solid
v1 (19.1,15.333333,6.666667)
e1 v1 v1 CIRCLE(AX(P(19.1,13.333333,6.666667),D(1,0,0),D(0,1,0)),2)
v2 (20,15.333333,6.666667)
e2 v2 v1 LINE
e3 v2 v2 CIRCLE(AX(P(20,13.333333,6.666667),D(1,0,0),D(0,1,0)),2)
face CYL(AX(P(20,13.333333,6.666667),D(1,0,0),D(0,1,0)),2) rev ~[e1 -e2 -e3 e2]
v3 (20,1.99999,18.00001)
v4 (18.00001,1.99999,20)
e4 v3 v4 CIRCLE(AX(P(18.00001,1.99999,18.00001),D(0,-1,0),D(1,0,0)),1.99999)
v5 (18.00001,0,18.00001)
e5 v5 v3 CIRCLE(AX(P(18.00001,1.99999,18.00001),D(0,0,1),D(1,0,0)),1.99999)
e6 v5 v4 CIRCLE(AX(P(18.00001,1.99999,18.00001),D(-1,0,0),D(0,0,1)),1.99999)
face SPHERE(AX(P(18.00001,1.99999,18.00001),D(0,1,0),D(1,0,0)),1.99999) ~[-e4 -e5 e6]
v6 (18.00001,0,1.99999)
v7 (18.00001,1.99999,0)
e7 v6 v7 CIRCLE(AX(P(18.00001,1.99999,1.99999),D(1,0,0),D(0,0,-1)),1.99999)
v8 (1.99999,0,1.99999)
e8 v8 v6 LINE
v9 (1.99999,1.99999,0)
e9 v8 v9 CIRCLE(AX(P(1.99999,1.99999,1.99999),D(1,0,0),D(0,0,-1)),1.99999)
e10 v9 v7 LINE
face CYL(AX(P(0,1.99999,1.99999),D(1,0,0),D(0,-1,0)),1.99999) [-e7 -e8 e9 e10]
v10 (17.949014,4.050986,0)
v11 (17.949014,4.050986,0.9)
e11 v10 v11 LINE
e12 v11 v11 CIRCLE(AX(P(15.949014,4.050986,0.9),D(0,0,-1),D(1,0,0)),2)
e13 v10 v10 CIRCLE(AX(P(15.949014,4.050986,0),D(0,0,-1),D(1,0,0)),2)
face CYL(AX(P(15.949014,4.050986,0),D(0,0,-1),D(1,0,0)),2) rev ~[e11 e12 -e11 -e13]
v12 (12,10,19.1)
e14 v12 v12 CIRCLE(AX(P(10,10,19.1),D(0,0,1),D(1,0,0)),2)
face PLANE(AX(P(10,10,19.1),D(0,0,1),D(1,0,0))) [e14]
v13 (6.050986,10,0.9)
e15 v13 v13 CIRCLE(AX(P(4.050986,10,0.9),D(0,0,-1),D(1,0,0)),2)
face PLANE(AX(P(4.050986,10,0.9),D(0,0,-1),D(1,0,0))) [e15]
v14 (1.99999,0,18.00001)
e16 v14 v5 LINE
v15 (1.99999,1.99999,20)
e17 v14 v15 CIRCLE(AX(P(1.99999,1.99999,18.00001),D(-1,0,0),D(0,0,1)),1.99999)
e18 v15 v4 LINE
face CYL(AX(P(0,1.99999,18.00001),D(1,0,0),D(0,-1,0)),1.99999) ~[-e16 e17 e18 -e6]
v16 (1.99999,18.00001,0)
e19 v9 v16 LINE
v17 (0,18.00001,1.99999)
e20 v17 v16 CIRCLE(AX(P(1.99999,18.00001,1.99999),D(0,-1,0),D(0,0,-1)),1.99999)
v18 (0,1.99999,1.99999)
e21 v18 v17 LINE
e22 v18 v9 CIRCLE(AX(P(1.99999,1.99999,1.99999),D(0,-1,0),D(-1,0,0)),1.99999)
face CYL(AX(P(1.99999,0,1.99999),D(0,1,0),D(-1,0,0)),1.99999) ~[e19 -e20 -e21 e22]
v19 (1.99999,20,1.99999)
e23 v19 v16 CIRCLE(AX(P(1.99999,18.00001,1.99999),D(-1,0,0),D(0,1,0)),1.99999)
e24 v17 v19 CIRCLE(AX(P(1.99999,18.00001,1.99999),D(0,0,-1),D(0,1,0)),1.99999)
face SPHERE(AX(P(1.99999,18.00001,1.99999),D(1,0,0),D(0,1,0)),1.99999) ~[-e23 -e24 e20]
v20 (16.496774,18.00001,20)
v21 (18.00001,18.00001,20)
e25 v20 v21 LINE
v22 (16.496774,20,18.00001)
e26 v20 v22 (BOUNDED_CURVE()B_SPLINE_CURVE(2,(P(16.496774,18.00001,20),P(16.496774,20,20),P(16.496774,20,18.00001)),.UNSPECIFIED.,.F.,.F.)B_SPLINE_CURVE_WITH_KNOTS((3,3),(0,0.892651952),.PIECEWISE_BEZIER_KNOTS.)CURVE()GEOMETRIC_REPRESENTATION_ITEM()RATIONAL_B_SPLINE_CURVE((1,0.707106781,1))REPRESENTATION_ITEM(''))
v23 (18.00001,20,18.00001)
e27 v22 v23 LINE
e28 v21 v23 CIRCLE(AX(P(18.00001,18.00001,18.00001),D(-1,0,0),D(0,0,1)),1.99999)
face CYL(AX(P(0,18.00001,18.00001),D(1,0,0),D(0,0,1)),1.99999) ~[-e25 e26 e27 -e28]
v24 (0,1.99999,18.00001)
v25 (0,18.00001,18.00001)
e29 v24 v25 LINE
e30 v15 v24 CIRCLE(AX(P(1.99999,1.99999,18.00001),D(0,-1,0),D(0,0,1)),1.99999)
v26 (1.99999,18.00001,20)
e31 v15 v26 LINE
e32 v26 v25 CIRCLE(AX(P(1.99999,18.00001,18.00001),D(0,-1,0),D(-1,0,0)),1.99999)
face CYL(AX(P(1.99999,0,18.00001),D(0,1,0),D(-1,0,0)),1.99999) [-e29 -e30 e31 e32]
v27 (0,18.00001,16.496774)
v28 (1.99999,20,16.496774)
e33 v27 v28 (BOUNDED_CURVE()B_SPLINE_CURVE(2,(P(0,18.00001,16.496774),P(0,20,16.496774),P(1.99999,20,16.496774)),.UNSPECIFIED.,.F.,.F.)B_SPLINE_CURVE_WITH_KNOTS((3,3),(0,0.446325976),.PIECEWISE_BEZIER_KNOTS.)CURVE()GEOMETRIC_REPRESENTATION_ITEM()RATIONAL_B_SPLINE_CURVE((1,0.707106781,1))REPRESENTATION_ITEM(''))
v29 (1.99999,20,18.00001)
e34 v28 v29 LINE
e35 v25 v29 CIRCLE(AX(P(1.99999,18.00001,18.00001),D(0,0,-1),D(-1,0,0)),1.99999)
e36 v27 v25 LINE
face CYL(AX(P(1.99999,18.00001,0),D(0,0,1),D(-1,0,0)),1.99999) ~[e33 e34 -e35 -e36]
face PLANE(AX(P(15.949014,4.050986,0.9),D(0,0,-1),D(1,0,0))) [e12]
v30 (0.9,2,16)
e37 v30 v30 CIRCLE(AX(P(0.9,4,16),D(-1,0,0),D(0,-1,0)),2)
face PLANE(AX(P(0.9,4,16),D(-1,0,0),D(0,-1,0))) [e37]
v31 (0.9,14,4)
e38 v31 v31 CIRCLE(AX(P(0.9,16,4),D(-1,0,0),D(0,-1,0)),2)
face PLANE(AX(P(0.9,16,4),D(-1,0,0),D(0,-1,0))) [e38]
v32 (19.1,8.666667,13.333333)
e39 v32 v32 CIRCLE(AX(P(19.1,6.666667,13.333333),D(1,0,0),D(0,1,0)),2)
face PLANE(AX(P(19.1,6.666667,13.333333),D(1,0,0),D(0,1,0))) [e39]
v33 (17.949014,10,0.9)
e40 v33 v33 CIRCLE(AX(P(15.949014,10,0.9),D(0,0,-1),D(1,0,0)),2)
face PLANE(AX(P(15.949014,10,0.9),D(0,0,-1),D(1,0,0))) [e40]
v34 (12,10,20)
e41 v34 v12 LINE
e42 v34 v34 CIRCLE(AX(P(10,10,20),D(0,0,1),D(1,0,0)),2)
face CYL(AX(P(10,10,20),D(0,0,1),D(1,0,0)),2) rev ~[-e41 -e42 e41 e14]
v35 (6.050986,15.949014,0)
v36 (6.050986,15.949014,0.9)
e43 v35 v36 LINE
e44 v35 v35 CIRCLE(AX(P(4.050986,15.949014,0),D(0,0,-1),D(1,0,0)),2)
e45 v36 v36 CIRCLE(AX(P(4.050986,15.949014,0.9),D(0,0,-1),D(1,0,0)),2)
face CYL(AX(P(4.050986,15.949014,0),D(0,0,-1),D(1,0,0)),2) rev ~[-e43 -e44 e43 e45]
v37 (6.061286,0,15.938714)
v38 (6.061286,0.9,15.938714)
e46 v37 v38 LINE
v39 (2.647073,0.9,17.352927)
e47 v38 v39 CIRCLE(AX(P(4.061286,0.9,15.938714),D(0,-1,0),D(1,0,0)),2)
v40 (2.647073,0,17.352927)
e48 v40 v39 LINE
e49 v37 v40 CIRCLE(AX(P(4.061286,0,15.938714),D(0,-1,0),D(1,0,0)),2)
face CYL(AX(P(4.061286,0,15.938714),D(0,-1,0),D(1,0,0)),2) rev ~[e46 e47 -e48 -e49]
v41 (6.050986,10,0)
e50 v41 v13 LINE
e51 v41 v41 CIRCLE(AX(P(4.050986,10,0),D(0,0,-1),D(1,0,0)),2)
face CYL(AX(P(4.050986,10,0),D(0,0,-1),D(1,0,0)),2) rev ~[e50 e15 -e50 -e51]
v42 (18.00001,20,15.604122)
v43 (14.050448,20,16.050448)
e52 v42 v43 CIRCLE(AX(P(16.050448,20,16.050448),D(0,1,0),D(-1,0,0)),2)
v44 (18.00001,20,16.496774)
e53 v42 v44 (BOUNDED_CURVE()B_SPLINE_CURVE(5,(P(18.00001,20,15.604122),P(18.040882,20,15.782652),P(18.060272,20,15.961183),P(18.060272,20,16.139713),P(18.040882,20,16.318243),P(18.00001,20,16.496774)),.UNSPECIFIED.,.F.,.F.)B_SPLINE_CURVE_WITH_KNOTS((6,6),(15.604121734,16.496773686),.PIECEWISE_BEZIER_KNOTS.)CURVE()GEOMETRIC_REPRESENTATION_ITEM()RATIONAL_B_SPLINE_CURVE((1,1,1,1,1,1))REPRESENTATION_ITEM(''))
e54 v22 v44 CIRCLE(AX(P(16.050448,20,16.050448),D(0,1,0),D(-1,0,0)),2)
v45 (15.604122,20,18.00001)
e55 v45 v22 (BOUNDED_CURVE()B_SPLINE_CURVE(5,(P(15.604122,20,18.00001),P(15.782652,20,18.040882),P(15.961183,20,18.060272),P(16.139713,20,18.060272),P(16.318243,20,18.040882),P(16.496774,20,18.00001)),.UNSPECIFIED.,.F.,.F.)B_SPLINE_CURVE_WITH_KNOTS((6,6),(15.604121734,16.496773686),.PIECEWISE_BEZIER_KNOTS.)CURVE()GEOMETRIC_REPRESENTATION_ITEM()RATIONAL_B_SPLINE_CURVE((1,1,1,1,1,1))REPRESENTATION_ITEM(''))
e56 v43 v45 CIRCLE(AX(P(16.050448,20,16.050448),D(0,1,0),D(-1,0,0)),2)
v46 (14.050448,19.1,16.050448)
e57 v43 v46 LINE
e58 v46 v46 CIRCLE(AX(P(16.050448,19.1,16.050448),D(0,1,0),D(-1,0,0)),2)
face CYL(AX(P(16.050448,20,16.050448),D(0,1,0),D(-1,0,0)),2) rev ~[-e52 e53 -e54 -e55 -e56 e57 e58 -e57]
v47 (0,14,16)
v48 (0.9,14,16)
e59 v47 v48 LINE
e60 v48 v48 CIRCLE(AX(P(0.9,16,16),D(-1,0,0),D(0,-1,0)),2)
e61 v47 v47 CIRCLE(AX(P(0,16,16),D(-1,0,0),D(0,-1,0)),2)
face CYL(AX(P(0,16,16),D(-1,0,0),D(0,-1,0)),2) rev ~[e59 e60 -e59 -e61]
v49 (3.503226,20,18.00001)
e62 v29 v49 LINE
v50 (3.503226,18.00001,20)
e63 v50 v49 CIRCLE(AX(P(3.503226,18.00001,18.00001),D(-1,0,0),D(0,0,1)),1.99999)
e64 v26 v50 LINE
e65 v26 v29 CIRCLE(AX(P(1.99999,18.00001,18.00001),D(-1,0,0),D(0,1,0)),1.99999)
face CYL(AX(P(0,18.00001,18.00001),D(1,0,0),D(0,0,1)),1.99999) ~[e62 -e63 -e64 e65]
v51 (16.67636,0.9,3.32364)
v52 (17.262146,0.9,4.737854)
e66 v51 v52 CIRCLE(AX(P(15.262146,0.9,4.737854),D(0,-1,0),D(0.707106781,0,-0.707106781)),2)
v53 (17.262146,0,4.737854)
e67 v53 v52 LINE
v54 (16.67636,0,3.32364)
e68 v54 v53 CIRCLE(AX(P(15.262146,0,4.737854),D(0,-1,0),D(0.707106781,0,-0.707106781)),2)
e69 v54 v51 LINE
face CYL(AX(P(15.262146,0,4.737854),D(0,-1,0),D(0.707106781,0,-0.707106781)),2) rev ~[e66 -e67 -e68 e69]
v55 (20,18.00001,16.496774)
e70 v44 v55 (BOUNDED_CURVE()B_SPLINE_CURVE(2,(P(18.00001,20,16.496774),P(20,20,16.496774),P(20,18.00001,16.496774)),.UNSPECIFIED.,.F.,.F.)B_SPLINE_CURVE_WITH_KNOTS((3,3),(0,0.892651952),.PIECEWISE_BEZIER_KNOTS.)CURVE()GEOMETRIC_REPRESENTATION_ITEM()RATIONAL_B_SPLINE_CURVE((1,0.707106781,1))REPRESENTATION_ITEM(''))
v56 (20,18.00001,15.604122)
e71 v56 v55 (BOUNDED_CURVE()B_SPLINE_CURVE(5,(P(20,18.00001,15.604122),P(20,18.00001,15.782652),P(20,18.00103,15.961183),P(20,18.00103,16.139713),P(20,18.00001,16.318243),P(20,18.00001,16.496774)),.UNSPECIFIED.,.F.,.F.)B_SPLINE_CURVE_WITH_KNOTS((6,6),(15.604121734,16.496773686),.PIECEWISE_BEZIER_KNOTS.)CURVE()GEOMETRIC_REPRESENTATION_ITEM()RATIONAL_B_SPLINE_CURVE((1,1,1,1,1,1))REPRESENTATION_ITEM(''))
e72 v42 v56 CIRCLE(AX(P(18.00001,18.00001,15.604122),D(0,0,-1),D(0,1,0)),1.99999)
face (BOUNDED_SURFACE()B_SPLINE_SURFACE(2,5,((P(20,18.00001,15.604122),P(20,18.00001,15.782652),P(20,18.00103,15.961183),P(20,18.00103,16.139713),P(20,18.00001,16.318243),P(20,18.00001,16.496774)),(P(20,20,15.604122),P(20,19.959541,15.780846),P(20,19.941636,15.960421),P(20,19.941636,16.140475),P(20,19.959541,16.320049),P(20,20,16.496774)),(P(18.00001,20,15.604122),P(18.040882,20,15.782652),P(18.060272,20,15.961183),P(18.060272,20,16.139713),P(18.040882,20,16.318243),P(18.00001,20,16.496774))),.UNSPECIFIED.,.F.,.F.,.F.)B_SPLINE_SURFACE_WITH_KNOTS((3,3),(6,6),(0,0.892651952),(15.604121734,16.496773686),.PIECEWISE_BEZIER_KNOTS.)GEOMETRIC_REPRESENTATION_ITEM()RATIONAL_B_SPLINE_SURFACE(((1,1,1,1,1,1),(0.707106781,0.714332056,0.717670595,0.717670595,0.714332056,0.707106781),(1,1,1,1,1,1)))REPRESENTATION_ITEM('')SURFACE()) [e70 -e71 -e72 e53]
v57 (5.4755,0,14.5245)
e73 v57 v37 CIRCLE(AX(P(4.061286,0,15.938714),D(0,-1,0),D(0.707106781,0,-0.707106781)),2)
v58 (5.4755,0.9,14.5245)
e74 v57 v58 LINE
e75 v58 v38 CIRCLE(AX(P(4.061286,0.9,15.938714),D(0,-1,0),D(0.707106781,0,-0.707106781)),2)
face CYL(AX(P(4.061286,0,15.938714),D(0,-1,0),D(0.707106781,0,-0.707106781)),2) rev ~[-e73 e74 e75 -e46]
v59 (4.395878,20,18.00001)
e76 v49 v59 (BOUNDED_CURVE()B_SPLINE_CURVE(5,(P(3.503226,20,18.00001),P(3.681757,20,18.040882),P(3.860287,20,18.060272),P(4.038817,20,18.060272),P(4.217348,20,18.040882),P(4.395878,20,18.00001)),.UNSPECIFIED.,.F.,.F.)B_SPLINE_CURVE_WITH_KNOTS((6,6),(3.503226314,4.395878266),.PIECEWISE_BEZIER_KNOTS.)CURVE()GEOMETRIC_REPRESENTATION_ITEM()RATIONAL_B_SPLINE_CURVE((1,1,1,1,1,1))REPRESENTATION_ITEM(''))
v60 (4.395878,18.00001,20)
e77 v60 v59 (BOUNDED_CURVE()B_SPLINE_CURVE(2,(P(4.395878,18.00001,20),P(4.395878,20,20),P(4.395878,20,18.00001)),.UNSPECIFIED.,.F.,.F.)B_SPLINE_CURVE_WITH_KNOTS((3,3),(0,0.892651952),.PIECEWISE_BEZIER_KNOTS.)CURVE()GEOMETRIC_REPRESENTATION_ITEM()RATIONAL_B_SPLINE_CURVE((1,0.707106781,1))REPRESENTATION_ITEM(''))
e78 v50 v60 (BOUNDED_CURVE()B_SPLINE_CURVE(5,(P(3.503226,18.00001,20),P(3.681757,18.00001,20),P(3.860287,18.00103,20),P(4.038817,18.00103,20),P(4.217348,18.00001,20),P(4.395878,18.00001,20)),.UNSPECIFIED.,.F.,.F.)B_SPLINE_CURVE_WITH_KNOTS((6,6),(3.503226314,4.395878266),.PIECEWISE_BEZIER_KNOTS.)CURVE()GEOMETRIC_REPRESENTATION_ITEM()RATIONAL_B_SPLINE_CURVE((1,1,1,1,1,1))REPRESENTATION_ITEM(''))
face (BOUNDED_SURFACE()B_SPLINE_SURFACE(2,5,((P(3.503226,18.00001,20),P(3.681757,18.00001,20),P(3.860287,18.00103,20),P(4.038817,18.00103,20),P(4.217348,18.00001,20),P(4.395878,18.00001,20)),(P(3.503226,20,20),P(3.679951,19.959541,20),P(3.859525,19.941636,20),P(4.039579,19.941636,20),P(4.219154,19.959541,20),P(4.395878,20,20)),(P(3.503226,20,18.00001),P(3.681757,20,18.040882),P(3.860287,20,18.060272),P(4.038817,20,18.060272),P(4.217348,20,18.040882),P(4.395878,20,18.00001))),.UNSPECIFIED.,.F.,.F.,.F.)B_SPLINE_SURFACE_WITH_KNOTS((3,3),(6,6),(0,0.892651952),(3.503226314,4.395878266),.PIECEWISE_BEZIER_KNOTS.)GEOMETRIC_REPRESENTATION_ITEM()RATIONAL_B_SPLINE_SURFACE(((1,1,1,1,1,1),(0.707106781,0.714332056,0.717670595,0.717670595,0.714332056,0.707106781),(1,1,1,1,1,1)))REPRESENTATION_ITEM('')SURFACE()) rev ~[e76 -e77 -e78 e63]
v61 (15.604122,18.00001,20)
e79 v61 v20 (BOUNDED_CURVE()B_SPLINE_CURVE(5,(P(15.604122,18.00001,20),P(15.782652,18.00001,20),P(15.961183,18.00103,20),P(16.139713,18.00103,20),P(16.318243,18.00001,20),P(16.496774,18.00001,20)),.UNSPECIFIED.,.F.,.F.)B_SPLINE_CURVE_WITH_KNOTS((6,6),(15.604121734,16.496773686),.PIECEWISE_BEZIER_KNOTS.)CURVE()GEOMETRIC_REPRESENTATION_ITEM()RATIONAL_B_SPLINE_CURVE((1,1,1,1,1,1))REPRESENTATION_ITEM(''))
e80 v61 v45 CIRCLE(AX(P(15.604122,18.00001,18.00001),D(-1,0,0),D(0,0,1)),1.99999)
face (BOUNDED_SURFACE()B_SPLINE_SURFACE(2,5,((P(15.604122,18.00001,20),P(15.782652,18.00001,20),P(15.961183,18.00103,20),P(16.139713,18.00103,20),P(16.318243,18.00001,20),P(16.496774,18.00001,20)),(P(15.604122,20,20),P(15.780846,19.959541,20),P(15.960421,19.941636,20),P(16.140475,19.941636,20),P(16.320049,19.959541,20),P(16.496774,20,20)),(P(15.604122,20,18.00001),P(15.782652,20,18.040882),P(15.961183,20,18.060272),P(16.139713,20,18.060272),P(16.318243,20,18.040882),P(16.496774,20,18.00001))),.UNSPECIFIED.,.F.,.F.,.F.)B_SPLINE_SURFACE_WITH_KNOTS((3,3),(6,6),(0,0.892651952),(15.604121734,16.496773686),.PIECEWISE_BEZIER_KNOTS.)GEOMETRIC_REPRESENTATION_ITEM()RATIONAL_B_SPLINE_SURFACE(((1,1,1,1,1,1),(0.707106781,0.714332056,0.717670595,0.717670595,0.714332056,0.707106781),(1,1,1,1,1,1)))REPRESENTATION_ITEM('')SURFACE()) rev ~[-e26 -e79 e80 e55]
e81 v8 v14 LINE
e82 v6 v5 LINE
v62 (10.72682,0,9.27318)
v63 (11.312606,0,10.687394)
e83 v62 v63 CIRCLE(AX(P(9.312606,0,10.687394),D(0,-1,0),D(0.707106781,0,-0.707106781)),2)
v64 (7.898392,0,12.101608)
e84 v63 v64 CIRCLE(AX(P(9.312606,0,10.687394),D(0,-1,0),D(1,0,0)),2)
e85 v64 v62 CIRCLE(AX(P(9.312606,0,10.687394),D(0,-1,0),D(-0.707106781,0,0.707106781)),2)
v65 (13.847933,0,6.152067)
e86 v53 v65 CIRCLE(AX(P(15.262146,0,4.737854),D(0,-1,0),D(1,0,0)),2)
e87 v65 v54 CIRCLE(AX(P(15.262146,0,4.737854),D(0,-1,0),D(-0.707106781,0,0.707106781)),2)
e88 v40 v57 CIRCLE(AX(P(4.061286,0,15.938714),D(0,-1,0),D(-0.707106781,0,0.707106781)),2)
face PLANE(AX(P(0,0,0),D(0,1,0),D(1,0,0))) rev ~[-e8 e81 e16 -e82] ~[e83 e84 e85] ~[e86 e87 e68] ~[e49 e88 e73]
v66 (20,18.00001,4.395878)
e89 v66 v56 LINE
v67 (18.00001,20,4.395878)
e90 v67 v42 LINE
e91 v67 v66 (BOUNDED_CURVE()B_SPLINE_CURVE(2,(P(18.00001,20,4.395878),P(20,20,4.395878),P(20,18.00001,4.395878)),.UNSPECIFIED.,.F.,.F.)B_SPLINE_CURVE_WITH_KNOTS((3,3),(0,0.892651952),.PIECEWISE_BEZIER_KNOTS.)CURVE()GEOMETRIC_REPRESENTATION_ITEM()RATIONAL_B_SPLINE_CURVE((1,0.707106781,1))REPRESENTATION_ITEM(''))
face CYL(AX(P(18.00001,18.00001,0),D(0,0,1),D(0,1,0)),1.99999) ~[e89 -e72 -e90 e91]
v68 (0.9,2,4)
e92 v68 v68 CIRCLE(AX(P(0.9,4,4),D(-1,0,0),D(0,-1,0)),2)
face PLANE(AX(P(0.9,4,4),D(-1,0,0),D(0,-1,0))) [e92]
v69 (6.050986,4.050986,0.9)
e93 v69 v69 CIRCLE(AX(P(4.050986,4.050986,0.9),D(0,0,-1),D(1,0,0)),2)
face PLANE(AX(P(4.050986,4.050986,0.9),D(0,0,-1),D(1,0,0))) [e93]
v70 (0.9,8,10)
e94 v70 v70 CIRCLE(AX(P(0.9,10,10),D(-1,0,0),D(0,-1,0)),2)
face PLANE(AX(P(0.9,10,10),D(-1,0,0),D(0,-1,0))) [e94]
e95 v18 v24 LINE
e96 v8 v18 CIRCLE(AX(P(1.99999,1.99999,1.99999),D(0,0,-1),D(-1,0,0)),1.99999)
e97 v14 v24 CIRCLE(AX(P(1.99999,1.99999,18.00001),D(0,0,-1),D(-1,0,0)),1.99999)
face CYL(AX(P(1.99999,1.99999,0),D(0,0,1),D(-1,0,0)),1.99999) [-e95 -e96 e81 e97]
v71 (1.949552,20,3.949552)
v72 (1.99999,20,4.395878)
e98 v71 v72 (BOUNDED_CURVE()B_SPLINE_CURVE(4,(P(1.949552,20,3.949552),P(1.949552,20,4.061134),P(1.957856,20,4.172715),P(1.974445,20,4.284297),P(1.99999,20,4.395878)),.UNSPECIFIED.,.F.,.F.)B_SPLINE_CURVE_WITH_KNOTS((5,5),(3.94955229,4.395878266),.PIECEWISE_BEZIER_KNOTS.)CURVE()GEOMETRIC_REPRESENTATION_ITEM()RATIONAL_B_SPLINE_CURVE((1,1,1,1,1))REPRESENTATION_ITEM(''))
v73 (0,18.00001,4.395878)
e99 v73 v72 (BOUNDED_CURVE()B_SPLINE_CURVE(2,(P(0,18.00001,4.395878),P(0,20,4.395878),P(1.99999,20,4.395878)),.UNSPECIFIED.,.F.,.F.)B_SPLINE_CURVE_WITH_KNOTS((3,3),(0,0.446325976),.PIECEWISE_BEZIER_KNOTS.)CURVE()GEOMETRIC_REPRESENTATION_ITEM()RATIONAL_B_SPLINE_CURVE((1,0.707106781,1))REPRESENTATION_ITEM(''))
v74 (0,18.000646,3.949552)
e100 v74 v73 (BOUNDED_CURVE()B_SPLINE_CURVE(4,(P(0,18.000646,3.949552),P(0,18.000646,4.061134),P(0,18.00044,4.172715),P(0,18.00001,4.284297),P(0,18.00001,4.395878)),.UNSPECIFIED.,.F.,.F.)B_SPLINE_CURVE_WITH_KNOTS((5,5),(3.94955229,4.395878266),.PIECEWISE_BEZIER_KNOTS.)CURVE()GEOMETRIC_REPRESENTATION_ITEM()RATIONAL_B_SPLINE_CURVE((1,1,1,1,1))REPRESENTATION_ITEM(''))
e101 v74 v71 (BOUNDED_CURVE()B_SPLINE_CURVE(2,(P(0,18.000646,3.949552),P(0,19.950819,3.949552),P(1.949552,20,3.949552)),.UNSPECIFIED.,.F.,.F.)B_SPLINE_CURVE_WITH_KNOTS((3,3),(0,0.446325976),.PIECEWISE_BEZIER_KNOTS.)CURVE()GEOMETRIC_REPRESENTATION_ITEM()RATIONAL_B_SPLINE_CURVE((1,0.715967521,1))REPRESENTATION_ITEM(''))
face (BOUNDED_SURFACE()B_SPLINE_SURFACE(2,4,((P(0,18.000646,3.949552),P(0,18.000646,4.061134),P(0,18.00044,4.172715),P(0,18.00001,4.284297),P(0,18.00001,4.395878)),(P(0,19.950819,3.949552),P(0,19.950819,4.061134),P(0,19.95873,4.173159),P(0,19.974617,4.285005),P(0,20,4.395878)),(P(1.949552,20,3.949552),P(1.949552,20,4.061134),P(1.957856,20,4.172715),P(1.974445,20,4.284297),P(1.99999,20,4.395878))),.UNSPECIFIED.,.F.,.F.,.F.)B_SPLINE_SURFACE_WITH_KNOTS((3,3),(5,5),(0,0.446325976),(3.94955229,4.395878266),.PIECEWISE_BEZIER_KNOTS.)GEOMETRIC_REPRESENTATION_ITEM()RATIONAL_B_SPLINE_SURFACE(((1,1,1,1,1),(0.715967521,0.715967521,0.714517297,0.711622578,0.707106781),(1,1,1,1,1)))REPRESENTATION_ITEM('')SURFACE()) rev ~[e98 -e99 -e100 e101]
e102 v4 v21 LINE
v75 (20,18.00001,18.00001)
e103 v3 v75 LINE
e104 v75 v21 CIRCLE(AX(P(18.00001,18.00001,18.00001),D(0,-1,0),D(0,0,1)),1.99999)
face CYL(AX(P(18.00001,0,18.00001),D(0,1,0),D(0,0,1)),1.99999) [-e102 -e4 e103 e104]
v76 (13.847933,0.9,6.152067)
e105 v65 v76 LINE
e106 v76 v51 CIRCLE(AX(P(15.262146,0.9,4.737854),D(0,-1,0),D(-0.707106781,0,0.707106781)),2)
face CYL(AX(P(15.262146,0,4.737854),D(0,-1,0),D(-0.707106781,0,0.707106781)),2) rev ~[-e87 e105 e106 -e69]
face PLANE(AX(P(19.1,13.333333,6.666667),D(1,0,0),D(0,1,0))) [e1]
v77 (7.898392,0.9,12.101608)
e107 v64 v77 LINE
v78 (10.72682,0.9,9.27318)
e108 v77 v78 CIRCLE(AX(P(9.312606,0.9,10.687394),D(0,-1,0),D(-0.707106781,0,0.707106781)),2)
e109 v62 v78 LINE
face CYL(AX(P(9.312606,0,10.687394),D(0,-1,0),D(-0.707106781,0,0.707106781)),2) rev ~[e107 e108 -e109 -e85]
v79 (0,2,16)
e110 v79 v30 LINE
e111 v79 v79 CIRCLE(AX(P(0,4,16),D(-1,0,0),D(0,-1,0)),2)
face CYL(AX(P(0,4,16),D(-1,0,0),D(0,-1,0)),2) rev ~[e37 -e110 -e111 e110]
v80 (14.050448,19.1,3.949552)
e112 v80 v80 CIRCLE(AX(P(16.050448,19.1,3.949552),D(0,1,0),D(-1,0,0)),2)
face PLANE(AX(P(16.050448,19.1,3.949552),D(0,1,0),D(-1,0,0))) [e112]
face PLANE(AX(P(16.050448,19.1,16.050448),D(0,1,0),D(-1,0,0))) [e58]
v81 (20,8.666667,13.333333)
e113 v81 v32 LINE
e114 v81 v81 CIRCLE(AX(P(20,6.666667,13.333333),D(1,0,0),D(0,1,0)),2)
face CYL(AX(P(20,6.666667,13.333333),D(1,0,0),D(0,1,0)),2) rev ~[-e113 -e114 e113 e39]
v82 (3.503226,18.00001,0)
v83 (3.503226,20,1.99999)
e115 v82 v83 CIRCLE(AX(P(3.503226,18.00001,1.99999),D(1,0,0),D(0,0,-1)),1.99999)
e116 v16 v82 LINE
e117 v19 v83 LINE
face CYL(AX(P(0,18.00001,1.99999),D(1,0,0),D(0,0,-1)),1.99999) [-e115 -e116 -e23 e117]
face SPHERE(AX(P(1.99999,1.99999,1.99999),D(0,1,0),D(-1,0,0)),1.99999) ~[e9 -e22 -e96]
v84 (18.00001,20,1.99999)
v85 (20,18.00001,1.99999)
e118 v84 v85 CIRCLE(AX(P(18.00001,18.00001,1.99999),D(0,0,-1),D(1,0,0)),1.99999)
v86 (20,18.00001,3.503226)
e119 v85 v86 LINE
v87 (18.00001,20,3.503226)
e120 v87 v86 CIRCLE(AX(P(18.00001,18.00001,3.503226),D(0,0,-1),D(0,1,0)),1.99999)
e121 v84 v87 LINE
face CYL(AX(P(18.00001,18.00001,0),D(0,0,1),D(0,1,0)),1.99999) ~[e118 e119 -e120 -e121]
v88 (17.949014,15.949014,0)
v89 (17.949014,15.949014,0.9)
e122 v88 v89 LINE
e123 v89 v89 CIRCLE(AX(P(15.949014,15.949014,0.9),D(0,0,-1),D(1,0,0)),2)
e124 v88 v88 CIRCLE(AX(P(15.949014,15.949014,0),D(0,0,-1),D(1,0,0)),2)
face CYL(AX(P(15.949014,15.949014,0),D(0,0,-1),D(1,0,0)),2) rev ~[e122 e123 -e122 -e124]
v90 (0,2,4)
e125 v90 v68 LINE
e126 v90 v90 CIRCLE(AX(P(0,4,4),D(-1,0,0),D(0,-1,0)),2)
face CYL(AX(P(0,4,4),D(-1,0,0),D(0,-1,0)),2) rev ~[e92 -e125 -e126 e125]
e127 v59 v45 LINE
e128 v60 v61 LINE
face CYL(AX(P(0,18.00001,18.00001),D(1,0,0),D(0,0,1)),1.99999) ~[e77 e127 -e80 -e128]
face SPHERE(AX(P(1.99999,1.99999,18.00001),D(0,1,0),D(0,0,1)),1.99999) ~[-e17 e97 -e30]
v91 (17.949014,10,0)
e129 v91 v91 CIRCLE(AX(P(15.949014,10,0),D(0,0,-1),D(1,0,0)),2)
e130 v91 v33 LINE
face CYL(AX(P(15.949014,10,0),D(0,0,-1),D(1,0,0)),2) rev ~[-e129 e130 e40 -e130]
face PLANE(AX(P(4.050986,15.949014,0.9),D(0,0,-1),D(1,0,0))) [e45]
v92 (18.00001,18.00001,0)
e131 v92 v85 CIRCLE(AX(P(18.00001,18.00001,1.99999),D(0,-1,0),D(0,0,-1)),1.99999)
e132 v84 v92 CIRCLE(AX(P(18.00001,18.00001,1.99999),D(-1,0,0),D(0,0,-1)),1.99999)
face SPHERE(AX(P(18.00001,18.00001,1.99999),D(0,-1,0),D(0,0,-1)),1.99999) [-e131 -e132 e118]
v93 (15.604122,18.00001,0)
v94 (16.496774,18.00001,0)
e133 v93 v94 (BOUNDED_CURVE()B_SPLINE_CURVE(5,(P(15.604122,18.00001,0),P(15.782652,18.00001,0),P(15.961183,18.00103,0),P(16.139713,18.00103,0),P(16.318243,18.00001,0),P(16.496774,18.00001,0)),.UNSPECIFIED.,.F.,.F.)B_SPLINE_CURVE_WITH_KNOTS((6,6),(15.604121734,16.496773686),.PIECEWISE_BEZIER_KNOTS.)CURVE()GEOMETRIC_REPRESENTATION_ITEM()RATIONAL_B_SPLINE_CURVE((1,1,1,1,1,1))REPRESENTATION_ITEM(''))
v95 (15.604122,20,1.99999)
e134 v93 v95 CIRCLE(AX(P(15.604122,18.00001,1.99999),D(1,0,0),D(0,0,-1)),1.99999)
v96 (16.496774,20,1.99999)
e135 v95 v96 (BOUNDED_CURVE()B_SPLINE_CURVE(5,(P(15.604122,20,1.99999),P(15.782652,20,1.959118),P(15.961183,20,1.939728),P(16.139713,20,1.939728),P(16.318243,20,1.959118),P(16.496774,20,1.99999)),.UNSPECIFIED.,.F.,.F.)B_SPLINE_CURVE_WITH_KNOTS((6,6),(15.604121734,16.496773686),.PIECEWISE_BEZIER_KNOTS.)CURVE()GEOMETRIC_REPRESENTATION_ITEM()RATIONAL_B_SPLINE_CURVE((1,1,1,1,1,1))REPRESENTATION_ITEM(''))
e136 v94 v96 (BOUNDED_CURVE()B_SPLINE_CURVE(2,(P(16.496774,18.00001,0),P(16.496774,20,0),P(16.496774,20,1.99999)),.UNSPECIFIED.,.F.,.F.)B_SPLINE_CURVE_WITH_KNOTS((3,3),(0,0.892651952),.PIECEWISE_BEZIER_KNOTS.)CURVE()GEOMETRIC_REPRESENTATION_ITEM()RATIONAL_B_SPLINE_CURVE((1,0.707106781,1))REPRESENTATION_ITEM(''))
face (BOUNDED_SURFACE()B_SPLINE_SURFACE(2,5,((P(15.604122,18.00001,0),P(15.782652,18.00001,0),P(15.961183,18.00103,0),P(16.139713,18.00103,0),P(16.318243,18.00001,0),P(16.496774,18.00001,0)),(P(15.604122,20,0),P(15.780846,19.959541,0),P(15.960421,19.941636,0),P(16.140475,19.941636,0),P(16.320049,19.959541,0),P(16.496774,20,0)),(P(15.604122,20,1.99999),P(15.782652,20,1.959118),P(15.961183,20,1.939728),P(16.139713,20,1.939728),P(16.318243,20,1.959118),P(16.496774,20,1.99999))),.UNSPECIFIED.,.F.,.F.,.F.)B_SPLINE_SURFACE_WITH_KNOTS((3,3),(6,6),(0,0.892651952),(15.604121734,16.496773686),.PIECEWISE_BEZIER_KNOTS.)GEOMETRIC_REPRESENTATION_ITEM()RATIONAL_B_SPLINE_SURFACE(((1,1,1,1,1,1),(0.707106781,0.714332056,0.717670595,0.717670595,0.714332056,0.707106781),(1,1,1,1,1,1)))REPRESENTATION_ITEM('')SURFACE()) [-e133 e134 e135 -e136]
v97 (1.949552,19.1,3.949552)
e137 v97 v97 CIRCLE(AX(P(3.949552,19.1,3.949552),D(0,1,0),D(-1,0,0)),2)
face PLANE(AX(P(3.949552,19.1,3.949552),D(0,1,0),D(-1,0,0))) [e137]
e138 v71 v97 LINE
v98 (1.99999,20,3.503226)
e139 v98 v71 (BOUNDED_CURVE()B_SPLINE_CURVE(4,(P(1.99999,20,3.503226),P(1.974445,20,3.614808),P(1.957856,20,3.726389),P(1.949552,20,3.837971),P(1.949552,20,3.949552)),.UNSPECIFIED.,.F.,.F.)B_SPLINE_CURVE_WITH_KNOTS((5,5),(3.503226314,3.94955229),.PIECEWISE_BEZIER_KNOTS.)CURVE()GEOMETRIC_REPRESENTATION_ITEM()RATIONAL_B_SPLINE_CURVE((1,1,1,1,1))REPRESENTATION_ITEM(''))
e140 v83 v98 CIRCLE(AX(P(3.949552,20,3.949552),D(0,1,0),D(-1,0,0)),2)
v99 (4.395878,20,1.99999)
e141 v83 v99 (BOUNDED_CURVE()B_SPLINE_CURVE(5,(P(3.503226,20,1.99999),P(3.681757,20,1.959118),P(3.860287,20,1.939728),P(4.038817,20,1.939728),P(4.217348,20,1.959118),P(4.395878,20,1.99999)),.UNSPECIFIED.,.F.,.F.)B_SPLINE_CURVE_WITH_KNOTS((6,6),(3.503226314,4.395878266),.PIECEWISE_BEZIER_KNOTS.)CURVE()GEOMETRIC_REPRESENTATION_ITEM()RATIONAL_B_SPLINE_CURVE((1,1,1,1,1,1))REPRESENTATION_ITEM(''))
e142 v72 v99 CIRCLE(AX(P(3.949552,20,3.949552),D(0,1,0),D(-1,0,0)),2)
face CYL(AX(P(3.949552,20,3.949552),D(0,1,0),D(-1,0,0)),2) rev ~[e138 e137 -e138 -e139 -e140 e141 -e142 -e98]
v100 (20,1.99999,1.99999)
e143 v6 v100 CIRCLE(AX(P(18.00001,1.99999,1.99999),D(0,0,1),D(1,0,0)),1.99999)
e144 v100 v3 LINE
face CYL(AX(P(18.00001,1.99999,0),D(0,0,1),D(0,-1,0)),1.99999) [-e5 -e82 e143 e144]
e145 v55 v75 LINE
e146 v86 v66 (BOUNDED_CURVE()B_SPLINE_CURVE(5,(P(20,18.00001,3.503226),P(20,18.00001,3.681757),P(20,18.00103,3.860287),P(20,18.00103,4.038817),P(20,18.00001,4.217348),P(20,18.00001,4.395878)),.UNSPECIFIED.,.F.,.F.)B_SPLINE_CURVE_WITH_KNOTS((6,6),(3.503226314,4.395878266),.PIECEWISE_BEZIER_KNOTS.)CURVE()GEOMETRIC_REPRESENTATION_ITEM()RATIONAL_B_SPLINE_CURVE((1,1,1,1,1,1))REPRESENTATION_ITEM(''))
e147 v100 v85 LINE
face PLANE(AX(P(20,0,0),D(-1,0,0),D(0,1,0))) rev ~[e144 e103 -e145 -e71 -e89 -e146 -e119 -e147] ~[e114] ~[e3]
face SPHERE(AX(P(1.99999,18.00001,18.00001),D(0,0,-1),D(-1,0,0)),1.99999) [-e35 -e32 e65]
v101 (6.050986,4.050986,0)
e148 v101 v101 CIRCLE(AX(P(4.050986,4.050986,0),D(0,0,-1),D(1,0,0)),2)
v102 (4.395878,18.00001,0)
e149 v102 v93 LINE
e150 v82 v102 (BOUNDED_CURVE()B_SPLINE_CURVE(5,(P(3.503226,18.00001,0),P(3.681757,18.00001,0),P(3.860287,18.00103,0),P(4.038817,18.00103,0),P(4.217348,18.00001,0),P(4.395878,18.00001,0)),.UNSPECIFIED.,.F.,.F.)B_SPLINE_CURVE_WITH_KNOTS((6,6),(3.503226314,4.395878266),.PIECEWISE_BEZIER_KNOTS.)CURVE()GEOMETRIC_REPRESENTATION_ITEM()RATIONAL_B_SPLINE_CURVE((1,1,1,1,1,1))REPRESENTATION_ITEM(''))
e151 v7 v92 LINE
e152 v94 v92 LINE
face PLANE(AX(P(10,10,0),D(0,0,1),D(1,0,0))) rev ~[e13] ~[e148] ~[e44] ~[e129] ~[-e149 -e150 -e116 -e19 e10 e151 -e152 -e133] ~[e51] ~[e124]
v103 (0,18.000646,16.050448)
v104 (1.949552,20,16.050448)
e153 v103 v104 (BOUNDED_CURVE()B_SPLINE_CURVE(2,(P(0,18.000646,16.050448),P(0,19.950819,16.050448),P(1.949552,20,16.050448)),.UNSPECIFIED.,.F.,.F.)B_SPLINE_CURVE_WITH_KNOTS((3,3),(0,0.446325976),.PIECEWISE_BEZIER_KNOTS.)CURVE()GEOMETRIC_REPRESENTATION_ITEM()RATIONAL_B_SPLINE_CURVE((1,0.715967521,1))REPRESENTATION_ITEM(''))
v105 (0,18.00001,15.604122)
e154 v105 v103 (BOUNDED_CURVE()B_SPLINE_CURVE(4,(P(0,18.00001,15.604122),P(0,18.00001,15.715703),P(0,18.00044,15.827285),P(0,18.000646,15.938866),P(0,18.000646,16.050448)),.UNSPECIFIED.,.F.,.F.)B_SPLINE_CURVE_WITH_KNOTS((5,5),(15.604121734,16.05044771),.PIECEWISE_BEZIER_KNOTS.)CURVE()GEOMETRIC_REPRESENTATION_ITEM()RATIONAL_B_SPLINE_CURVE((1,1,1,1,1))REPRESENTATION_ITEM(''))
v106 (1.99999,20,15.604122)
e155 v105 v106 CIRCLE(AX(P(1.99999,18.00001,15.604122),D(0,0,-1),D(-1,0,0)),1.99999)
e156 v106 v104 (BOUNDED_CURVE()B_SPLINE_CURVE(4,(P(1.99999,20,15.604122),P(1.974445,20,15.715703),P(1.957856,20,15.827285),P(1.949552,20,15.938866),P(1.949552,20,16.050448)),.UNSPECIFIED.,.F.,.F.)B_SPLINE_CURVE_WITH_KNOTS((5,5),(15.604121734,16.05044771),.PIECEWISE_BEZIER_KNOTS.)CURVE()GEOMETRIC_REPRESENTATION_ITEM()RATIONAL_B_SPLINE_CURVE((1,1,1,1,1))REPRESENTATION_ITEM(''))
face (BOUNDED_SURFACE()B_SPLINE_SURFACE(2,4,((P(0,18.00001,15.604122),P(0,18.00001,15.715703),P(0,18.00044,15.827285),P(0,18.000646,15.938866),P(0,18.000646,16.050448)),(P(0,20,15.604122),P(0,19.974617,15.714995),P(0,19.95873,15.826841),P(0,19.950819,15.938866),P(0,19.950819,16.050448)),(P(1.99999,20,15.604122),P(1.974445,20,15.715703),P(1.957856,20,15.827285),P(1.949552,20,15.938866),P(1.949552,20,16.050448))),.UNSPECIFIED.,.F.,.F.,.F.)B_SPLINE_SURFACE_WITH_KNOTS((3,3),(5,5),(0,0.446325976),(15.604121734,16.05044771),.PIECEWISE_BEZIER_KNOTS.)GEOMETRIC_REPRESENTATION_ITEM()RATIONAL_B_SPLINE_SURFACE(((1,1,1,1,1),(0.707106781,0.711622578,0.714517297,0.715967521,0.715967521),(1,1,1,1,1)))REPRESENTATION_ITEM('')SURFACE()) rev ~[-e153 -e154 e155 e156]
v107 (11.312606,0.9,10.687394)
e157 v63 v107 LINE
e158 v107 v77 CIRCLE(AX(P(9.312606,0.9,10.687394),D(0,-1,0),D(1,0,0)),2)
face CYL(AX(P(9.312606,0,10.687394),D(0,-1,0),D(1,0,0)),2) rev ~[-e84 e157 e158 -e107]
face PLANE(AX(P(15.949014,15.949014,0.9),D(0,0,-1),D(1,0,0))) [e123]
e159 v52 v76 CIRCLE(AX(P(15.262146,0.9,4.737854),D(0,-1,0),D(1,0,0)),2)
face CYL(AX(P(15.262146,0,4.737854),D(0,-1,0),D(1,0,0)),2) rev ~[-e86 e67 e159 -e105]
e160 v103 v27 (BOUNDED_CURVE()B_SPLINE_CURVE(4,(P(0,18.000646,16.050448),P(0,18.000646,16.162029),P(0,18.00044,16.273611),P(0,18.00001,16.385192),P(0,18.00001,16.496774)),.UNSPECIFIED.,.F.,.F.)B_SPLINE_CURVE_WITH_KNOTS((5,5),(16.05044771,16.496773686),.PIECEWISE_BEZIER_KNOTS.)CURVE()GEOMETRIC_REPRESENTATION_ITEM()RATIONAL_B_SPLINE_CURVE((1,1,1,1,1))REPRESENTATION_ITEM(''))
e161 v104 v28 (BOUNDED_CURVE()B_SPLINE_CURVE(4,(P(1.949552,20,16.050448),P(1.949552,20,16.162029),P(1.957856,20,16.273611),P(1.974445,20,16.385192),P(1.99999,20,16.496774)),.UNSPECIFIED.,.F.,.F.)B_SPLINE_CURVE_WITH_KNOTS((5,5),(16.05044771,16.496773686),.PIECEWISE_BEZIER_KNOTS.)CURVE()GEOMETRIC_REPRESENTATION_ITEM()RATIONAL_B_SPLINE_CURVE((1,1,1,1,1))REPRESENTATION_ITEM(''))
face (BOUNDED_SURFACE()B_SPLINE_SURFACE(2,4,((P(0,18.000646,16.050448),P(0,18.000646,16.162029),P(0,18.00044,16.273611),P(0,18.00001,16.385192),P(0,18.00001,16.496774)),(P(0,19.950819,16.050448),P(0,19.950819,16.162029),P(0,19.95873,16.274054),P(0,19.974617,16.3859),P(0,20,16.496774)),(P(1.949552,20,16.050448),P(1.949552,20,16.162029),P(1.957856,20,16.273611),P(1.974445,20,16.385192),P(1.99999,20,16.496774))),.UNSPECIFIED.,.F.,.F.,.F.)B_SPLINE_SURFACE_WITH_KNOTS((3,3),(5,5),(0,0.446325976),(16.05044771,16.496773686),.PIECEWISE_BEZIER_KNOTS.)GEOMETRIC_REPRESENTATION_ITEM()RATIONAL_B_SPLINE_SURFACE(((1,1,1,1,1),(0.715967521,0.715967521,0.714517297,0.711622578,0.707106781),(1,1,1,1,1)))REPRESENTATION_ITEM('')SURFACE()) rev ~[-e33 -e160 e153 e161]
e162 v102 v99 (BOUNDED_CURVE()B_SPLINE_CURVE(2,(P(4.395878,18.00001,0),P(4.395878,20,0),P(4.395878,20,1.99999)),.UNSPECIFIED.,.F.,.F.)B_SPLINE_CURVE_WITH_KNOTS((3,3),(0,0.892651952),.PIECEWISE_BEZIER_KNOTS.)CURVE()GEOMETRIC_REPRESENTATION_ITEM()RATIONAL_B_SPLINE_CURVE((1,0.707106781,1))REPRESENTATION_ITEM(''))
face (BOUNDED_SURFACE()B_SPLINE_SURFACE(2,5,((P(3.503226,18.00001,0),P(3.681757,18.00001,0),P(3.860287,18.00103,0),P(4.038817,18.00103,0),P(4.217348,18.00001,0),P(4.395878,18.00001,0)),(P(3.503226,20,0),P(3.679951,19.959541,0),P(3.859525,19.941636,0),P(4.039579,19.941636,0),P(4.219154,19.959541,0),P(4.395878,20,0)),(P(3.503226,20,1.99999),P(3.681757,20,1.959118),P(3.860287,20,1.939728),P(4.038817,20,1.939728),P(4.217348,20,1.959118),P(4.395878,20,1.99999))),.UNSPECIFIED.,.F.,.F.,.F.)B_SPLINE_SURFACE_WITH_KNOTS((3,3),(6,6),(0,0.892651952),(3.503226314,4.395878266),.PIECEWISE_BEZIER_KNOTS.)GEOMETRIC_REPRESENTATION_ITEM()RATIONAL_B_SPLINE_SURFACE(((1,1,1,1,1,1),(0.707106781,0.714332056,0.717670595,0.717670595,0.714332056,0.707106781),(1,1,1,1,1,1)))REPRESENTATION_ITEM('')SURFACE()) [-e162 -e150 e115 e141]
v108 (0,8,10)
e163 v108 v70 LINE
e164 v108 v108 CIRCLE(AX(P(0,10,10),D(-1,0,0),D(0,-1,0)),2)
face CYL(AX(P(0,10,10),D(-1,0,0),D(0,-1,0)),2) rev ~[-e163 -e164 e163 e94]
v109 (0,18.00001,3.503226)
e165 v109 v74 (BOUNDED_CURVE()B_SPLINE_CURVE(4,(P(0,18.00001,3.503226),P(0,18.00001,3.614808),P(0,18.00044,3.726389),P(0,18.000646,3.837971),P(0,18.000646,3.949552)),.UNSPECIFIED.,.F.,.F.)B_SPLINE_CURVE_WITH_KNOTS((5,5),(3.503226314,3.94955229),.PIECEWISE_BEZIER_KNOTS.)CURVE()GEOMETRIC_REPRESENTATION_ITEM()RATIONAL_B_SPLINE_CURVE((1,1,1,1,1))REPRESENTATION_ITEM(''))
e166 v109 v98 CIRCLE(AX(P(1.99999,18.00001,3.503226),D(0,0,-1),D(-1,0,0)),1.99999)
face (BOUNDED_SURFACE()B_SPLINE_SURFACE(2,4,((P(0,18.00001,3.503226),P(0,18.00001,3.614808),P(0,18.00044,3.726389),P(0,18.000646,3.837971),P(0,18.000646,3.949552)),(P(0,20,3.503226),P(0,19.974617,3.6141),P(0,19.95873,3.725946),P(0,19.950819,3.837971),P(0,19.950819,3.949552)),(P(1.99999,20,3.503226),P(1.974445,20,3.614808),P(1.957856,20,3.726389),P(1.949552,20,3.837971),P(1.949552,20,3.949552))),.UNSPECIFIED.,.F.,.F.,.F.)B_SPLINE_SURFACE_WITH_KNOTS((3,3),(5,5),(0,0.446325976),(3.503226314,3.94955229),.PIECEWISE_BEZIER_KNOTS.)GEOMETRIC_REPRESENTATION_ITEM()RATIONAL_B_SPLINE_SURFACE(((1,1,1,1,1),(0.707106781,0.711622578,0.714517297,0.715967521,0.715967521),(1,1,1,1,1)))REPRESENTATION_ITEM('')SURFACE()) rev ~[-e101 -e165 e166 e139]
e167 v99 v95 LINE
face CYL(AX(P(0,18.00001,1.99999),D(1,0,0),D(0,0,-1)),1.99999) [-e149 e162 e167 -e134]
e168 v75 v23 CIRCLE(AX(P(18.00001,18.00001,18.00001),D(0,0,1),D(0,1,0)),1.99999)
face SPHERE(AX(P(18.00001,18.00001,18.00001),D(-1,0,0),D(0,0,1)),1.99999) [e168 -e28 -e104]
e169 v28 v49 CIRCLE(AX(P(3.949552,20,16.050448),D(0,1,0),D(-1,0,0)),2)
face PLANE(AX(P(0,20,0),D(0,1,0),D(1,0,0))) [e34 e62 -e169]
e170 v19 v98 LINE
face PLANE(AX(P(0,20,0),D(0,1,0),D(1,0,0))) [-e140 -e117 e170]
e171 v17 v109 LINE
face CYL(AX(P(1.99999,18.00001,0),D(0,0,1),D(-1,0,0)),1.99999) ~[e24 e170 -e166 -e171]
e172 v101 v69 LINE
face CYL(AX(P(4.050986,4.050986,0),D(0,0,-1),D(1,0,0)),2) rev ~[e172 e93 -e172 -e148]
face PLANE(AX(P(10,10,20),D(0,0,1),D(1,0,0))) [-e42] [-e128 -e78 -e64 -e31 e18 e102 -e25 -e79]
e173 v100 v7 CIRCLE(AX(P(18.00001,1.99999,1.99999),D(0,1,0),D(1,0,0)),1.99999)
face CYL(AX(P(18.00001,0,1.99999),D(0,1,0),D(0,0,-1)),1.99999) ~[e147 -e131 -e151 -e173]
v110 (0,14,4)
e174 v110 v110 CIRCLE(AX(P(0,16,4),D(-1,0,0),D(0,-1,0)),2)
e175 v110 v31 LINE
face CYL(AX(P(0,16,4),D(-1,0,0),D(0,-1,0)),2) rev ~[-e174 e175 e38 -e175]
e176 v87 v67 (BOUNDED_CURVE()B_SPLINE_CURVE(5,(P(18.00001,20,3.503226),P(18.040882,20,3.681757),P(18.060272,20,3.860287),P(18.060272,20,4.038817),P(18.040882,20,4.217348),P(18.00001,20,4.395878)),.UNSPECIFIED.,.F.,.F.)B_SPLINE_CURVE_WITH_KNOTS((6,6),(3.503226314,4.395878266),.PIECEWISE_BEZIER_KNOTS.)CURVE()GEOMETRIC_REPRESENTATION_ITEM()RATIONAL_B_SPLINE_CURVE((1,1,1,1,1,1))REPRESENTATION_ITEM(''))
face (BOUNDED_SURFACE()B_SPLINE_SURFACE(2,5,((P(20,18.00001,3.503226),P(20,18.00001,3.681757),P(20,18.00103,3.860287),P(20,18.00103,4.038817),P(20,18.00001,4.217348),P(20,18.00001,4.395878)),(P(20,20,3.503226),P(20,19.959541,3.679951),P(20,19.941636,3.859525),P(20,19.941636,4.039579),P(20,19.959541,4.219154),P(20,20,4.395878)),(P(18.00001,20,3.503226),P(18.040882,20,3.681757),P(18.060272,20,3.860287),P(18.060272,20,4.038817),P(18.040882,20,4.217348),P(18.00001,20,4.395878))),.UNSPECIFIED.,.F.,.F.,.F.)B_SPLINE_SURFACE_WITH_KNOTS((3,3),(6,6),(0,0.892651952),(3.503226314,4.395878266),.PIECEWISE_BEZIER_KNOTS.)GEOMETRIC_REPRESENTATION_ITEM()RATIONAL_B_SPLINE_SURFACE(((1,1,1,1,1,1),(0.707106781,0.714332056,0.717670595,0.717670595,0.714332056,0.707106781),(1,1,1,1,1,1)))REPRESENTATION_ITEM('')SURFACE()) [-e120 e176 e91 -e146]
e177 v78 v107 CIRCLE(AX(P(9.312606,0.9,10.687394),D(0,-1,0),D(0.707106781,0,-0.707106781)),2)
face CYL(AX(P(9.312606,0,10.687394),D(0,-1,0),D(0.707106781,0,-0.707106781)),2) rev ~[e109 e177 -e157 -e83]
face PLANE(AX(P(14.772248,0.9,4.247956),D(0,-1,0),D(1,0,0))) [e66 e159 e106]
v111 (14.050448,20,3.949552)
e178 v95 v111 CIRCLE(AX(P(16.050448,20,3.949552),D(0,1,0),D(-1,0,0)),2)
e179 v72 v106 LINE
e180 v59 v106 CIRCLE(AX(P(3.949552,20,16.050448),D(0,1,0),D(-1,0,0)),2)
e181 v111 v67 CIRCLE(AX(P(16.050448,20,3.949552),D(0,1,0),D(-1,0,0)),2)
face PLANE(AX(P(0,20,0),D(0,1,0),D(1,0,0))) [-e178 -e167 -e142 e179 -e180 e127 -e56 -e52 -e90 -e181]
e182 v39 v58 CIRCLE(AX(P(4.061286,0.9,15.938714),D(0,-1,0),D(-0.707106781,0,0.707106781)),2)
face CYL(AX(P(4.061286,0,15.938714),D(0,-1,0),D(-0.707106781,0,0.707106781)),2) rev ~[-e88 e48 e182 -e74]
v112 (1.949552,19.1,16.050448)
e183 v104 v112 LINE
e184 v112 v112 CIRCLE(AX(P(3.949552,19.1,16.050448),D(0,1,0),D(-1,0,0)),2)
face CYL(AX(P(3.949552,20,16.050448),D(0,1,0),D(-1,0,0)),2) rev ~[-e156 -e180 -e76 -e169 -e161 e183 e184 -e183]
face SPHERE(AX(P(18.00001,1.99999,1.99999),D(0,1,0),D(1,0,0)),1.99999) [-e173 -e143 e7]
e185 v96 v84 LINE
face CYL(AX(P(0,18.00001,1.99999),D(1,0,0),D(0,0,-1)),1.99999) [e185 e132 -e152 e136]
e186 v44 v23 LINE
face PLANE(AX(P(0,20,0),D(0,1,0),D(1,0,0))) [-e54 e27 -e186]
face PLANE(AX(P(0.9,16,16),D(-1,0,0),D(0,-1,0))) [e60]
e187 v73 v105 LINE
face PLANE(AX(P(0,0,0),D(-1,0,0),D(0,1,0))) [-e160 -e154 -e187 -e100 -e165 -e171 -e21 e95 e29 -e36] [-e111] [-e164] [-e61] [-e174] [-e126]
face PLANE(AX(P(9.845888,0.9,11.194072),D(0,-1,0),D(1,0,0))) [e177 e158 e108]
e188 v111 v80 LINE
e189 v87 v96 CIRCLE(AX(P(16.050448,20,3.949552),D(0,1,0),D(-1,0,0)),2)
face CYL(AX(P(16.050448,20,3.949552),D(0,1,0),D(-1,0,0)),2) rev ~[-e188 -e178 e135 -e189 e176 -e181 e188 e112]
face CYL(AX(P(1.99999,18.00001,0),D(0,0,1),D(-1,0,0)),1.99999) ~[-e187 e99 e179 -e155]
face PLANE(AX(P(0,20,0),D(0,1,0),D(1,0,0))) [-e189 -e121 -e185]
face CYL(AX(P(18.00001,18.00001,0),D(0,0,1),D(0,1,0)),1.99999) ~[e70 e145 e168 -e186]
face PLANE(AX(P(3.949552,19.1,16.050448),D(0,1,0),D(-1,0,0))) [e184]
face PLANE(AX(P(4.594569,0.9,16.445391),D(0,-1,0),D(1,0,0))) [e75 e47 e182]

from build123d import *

# Parameters (mm, degrees)
F0_W      = 20
F0_H      = 20
F1_DEPTH  = 20
F5_R      = 2
F8_DEPTH  = 0.9
F2_R      = 2
F9_DEPTH  = 0.9
F4_R      = 2
F10_DEPTH = 0.9
F7_R      = 2
F11_DEPTH = 0.9
F12_DEPTH = 0.9
F3_R      = 2
F13_DEPTH = 0.9
F14_R     = 1.99999


# Not quite as in the source:
# - a fillet or chamfer is up to 0.001 mm smaller than in the source, because OpenCascade refuses the exact size


with BuildPart() as f1:
    # F0 (on Top) → F1 (new body)
    with BuildSketch(Plane.XY):
        with Locations((10, 10)):
            Rectangle(F0_W, F0_H)
    extrude(amount=F1_DEPTH)

    # F5 (on face) → F8 (cut)
    with BuildSketch(Plane(origin=(0, 0, 0), x_dir=(0, -1, 0), z_dir=(-1, 0, 0))):
        with Locations((-16, 16)):
            Circle(F5_R)
        with Locations((-10, 10)):
            Circle(F5_R)
        with Locations((-4, 16)):
            Circle(F5_R)
        with Locations((-4, 4)):
            Circle(F5_R)
        with Locations((-16, 4)):
            Circle(F5_R)
    extrude(amount=-F8_DEPTH, mode=Mode.SUBTRACT)

    # F2 (on face) → F9 (cut)
    with BuildSketch(Plane.XY.offset(20)):
        with Locations((10, 10)):
            Circle(F2_R)
    extrude(amount=-F9_DEPTH, mode=Mode.SUBTRACT)

    # F4 (on face) → F10 (cut)
    with BuildSketch(Plane.YZ.offset(20)):
        with Locations((13.3333333333, 6.6666666667)):
            Circle(F4_R)
        with Locations((6.6666666667, 13.3333333333)):
            Circle(F4_R)
    extrude(amount=-F10_DEPTH, mode=Mode.SUBTRACT)

    # F7 (on face) → F11 (cut)
    with BuildSketch(Plane(origin=(0, 20, 0), x_dir=(-1, 0, 0), z_dir=(0, 1, 0))):
        with Locations((-3.9495522901, 16.0504477099)):
            Circle(F7_R)
        with Locations((-3.9495522901, 3.9495522901)):
            Circle(F7_R)
        with Locations((-16.0504477099, 3.9495522901)):
            Circle(F7_R)
        with Locations((-16.0504477099, 16.0504477099)):
            Circle(F7_R)
    extrude(amount=-F11_DEPTH, mode=Mode.SUBTRACT)

    # F6 (on face) → F12 (cut)
    with BuildSketch(Plane.XZ):
        with BuildLine():
            Line((15.2621462241, 4.7378537759), (13.8479326617, 6.1520673383))
            ThreePointArc((13.8479326617, 6.1520673383), (13.8479326617, 3.3236402136), (16.6763597864, 3.3236402136))
            Line((16.6763597864, 3.3236402136), (15.2621462241, 4.7378537759))
        make_face()
        with BuildLine():
            ThreePointArc((17.2621462241, 4.7378537759), (16.0275130888, 6.585612841), (13.8479326617, 6.1520673383))
            Line((13.8479326617, 6.1520673383), (15.2621462241, 4.7378537759))
            Line((15.2621462241, 4.7378537759), (16.6763597864, 3.3236402136))
            ThreePointArc((16.6763597864, 3.3236402136), (17.1099052891, 3.9724869112), (17.2621462241, 4.7378537759))
        make_face()
        with BuildLine():
            ThreePointArc((11.3126059573, 10.6873940427), (10.077972822, 12.5351531078), (7.8983923949, 12.1016076051))
            Line((7.8983923949, 12.1016076051), (9.3126059573, 10.6873940427))
            Line((9.3126059573, 10.6873940427), (10.7268195196, 9.2731804804))
            ThreePointArc((10.7268195196, 9.2731804804), (11.1603650223, 9.922027178), (11.3126059573, 10.6873940427))
        make_face()
        with BuildLine():
            Line((9.3126059573, 10.6873940427), (7.8983923949, 12.1016076051))
            ThreePointArc((7.8983923949, 12.1016076051), (7.8983923949, 9.2731804804), (10.7268195196, 9.2731804804))
            Line((10.7268195196, 9.2731804804), (9.3126059573, 10.6873940427))
        make_face()
        with BuildLine():
            ThreePointArc((5.475499908, 14.524500092), (5.9090454106, 15.1733467897), (6.0612863456, 15.9387136544))
            ThreePointArc((6.0612863456, 15.9387136544), (4.8266532103, 17.7864727194), (2.6470727832, 17.3529272168))
            Line((2.6470727832, 17.3529272168), (4.0612863456, 15.9387136544))
            Line((4.0612863456, 15.9387136544), (5.475499908, 14.524500092))
        make_face()
        with BuildLine():
            Line((4.0612863456, 15.9387136544), (2.6470727832, 17.3529272168))
            ThreePointArc((2.6470727832, 17.3529272168), (2.6470727832, 14.524500092), (5.475499908, 14.524500092))
            Line((5.475499908, 14.524500092), (4.0612863456, 15.9387136544))
        make_face()
    extrude(amount=-F12_DEPTH, mode=Mode.SUBTRACT)

    # F3 (on face) → F13 (cut)
    with BuildSketch(Plane(origin=(0, 0, 0), x_dir=(1, 0, 0), z_dir=(0, 0, -1))):
        with Locations((15.949013711, -4.050986289)):
            Circle(F3_R)
        with Locations((15.949013711, -10)):
            Circle(F3_R)
        with Locations((15.949013711, -15.949013711)):
            Circle(F3_R)
        with Locations((4.050986289, -4.050986289)):
            Circle(F3_R)
        with Locations((4.050986289, -10)):
            Circle(F3_R)
        with Locations((4.050986289, -15.949013711)):
            Circle(F3_R)
    extrude(amount=-F13_DEPTH, mode=Mode.SUBTRACT)

    # F14 (radius 2 in the source; OpenCascade refuses exactly that, so slightly less here)
    f14_edges = [f1.edges().sort_by_distance(p)[0] for p in [
        (20, 10, 0),
        (10, 20, 0),
        (0, 20, 10),
        (0, 10, 20),
        (10, 20, 20),
        (20, 10, 20),
        (20, 0, 10),
        (10, 0, 20),
        (20, 20, 10),
        (0, 10, 0),
        (0, 0, 10),
        (10, 0, 0),
    ]]
    fillet(f14_edges, radius=F14_R)


solid = f1.part
